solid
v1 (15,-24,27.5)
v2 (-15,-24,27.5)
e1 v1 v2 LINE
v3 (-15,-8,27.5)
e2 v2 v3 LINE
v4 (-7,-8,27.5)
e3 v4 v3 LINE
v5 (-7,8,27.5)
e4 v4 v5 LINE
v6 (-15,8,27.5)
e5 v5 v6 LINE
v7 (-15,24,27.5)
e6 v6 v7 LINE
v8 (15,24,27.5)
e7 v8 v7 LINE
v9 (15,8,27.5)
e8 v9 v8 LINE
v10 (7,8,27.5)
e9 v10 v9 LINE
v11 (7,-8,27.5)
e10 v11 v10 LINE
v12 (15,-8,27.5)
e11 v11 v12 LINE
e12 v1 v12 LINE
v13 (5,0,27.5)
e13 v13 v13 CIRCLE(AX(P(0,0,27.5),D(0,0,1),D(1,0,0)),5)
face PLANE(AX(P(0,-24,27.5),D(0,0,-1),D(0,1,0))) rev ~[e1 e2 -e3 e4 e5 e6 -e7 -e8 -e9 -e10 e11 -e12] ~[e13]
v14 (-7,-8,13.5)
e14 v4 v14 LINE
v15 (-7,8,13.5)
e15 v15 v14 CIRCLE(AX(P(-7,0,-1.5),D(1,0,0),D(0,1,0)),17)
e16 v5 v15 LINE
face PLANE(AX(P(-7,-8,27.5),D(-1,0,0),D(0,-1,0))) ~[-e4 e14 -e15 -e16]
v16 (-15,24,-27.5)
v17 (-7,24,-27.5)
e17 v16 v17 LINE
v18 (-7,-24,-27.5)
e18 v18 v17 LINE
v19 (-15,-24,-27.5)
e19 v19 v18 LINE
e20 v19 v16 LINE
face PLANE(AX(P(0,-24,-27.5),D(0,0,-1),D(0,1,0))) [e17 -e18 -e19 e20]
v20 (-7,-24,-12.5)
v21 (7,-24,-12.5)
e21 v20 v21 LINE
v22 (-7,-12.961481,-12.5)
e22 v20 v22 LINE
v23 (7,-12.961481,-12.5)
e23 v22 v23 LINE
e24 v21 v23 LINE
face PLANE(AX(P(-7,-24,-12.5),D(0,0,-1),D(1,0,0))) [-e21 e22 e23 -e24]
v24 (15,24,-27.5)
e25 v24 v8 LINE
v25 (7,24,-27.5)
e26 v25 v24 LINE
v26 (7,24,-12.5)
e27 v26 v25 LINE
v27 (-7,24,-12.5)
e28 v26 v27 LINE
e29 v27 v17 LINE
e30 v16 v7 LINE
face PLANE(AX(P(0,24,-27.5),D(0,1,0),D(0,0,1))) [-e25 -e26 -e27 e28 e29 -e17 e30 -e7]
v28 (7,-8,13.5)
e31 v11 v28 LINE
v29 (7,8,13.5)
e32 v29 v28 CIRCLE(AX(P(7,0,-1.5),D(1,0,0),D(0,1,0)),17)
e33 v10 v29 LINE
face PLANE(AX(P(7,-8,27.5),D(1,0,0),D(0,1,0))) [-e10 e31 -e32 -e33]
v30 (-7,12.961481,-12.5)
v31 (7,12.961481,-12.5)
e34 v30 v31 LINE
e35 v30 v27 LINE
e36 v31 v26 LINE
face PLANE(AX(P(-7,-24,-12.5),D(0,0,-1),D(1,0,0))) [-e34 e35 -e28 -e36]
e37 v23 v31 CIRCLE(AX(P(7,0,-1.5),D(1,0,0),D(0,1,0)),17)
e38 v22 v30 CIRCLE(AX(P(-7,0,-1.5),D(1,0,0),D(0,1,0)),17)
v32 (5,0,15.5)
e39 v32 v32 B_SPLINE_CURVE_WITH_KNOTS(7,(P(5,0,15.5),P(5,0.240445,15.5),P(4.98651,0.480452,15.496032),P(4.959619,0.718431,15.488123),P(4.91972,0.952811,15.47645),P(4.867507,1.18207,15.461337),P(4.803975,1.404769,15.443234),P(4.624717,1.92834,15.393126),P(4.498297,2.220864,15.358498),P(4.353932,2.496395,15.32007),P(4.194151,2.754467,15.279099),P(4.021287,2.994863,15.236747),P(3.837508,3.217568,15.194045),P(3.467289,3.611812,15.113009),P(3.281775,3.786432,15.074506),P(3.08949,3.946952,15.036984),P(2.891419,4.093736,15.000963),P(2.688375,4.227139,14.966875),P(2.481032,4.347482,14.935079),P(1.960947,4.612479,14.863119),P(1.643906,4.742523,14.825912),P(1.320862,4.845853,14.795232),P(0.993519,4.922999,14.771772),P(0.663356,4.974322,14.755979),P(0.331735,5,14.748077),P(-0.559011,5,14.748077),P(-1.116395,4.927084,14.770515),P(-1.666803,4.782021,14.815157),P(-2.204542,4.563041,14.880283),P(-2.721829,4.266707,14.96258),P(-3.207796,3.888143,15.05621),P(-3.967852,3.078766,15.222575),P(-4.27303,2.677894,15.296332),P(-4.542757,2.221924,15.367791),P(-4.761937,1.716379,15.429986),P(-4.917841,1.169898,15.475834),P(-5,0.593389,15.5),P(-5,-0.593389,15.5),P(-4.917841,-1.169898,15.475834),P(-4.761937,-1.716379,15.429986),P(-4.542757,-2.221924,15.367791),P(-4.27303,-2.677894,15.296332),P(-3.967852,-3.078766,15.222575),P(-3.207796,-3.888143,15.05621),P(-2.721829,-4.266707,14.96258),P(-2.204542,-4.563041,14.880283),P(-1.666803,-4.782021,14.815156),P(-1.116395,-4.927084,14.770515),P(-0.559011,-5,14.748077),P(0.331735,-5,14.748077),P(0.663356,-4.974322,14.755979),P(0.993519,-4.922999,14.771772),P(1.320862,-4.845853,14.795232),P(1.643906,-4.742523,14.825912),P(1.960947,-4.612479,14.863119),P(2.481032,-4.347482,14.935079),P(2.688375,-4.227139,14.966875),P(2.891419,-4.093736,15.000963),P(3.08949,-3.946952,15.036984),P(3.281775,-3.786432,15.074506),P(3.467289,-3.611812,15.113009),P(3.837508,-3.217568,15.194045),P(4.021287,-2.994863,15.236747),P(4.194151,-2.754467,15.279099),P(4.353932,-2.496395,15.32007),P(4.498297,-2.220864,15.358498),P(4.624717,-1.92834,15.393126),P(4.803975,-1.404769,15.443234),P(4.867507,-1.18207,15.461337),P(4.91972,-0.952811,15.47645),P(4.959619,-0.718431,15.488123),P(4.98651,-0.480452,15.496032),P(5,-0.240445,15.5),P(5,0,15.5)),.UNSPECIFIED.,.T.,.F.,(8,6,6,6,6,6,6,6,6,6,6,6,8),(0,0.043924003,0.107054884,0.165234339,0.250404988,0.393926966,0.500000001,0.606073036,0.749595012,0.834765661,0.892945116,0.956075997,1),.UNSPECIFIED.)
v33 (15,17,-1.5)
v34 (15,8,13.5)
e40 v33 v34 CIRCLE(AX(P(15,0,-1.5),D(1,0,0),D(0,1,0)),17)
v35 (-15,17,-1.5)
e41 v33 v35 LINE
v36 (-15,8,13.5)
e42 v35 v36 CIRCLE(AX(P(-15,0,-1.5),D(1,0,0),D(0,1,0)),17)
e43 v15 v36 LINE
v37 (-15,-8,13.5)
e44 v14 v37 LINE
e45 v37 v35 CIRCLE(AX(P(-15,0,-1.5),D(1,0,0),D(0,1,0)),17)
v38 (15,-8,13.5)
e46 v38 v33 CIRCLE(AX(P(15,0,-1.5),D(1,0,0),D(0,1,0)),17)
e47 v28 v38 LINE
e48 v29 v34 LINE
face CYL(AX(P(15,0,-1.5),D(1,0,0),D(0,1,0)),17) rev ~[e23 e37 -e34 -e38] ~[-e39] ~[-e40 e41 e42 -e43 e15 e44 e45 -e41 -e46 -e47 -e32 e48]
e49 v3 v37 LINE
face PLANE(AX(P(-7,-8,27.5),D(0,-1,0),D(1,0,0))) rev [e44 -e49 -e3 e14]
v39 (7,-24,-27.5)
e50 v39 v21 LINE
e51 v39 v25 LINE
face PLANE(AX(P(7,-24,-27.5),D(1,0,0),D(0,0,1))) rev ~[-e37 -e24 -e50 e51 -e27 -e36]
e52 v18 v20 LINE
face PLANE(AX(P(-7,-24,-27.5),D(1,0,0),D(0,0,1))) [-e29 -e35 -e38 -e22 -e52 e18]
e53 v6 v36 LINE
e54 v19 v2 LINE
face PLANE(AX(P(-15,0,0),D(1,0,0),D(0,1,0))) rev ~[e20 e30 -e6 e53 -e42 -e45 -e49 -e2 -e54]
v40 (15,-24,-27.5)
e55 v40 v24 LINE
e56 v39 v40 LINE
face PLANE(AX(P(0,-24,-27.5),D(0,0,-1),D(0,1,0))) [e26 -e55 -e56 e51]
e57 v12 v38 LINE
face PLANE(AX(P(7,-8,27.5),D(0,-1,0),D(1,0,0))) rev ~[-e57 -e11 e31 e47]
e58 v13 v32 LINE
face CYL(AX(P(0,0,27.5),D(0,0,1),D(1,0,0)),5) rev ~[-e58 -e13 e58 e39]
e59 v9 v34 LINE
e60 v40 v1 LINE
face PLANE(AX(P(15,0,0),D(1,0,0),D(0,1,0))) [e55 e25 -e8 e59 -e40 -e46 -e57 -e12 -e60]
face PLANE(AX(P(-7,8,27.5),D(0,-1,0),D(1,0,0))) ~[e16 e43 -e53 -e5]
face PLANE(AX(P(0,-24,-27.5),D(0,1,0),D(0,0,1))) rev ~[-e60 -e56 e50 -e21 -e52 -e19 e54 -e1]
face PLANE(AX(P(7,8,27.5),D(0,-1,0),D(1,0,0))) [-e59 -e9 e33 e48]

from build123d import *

# Parameters (mm, degrees)
F0_W     = 48
F0_H     = 55
F1_DEPTH = 15
F2_R     = 17
F3_DEPTH = 30.001
F4_W     = 8
F4_H     = 16
F5_REACH = 72.88954382
F6_R     = 5
F7_REACH = 69.1431356237
F8_W     = 14
F8_H     = 15
F9_DEPTH = 48.001


# Not quite as in the source:
# - a pattern or mirror of a feature is missing from the dataset's text; its kind, count and spacing are read off the source's solid


with BuildPart() as f1:
    # F0 (on Right) → F1 (new body, symmetric)
    with BuildSketch(Plane.YZ):
        Rectangle(F0_W, F0_H)
    extrude(amount=F1_DEPTH, both=True)

    # F2 (on face) → F3 (cut, through all)
    with BuildSketch(Plane.YZ.offset(15)):
        with Locations((0, -1.5)):
            Circle(F2_R)
    extrude(amount=-F3_DEPTH, mode=Mode.SUBTRACT)

    f5_end = f1.faces().sort_by_distance((0, -17, -1.5))[0]
    # F4 (on face) → F5 (cut, up to a face of the model that its end follows)
    with BuildSketch(Plane.XY.offset(27.5)):
        with Locations((11, 0)):
            Rectangle(F4_W, F4_H)
    f5_long = extrude(amount=-F5_REACH, mode=Mode.PRIVATE)
    f5 = split(f5_long, bisect_by=f5_end, keep=Keep.ALL, mode=Mode.PRIVATE).solids().sort_by_distance((11, 0, 27.5))[0]
    add(f5, mode=Mode.SUBTRACT)

    # F5_copies: F5 across plane
    add(f5.mirror(Plane(origin=(0, 0, 0), x_dir=(0, 0, -1), z_dir=(-1, 0, 0))), mode=Mode.SUBTRACT)

    f7_end = f1.faces().sort_by_distance((0, -17, -1.5))[0]
    # F6 (on face) → F7 (cut, up to a face of the model that its end follows)
    with BuildSketch(Plane.XY.offset(27.5)):
        Circle(F6_R)
    f7_long = extrude(amount=-F7_REACH, mode=Mode.PRIVATE)
    add(split(f7_long, bisect_by=f7_end, keep=Keep.ALL, mode=Mode.PRIVATE).solids().sort_by_distance((0, 0, 27.5))[0], mode=Mode.SUBTRACT)

    # F8 (on face) → F9 (cut, through all)
    with BuildSketch(Plane.XZ.offset(24)):
        with Locations((0, -20)):
            Rectangle(F8_W, F8_H)
    extrude(amount=-F9_DEPTH, mode=Mode.SUBTRACT)


solid = f1.part
